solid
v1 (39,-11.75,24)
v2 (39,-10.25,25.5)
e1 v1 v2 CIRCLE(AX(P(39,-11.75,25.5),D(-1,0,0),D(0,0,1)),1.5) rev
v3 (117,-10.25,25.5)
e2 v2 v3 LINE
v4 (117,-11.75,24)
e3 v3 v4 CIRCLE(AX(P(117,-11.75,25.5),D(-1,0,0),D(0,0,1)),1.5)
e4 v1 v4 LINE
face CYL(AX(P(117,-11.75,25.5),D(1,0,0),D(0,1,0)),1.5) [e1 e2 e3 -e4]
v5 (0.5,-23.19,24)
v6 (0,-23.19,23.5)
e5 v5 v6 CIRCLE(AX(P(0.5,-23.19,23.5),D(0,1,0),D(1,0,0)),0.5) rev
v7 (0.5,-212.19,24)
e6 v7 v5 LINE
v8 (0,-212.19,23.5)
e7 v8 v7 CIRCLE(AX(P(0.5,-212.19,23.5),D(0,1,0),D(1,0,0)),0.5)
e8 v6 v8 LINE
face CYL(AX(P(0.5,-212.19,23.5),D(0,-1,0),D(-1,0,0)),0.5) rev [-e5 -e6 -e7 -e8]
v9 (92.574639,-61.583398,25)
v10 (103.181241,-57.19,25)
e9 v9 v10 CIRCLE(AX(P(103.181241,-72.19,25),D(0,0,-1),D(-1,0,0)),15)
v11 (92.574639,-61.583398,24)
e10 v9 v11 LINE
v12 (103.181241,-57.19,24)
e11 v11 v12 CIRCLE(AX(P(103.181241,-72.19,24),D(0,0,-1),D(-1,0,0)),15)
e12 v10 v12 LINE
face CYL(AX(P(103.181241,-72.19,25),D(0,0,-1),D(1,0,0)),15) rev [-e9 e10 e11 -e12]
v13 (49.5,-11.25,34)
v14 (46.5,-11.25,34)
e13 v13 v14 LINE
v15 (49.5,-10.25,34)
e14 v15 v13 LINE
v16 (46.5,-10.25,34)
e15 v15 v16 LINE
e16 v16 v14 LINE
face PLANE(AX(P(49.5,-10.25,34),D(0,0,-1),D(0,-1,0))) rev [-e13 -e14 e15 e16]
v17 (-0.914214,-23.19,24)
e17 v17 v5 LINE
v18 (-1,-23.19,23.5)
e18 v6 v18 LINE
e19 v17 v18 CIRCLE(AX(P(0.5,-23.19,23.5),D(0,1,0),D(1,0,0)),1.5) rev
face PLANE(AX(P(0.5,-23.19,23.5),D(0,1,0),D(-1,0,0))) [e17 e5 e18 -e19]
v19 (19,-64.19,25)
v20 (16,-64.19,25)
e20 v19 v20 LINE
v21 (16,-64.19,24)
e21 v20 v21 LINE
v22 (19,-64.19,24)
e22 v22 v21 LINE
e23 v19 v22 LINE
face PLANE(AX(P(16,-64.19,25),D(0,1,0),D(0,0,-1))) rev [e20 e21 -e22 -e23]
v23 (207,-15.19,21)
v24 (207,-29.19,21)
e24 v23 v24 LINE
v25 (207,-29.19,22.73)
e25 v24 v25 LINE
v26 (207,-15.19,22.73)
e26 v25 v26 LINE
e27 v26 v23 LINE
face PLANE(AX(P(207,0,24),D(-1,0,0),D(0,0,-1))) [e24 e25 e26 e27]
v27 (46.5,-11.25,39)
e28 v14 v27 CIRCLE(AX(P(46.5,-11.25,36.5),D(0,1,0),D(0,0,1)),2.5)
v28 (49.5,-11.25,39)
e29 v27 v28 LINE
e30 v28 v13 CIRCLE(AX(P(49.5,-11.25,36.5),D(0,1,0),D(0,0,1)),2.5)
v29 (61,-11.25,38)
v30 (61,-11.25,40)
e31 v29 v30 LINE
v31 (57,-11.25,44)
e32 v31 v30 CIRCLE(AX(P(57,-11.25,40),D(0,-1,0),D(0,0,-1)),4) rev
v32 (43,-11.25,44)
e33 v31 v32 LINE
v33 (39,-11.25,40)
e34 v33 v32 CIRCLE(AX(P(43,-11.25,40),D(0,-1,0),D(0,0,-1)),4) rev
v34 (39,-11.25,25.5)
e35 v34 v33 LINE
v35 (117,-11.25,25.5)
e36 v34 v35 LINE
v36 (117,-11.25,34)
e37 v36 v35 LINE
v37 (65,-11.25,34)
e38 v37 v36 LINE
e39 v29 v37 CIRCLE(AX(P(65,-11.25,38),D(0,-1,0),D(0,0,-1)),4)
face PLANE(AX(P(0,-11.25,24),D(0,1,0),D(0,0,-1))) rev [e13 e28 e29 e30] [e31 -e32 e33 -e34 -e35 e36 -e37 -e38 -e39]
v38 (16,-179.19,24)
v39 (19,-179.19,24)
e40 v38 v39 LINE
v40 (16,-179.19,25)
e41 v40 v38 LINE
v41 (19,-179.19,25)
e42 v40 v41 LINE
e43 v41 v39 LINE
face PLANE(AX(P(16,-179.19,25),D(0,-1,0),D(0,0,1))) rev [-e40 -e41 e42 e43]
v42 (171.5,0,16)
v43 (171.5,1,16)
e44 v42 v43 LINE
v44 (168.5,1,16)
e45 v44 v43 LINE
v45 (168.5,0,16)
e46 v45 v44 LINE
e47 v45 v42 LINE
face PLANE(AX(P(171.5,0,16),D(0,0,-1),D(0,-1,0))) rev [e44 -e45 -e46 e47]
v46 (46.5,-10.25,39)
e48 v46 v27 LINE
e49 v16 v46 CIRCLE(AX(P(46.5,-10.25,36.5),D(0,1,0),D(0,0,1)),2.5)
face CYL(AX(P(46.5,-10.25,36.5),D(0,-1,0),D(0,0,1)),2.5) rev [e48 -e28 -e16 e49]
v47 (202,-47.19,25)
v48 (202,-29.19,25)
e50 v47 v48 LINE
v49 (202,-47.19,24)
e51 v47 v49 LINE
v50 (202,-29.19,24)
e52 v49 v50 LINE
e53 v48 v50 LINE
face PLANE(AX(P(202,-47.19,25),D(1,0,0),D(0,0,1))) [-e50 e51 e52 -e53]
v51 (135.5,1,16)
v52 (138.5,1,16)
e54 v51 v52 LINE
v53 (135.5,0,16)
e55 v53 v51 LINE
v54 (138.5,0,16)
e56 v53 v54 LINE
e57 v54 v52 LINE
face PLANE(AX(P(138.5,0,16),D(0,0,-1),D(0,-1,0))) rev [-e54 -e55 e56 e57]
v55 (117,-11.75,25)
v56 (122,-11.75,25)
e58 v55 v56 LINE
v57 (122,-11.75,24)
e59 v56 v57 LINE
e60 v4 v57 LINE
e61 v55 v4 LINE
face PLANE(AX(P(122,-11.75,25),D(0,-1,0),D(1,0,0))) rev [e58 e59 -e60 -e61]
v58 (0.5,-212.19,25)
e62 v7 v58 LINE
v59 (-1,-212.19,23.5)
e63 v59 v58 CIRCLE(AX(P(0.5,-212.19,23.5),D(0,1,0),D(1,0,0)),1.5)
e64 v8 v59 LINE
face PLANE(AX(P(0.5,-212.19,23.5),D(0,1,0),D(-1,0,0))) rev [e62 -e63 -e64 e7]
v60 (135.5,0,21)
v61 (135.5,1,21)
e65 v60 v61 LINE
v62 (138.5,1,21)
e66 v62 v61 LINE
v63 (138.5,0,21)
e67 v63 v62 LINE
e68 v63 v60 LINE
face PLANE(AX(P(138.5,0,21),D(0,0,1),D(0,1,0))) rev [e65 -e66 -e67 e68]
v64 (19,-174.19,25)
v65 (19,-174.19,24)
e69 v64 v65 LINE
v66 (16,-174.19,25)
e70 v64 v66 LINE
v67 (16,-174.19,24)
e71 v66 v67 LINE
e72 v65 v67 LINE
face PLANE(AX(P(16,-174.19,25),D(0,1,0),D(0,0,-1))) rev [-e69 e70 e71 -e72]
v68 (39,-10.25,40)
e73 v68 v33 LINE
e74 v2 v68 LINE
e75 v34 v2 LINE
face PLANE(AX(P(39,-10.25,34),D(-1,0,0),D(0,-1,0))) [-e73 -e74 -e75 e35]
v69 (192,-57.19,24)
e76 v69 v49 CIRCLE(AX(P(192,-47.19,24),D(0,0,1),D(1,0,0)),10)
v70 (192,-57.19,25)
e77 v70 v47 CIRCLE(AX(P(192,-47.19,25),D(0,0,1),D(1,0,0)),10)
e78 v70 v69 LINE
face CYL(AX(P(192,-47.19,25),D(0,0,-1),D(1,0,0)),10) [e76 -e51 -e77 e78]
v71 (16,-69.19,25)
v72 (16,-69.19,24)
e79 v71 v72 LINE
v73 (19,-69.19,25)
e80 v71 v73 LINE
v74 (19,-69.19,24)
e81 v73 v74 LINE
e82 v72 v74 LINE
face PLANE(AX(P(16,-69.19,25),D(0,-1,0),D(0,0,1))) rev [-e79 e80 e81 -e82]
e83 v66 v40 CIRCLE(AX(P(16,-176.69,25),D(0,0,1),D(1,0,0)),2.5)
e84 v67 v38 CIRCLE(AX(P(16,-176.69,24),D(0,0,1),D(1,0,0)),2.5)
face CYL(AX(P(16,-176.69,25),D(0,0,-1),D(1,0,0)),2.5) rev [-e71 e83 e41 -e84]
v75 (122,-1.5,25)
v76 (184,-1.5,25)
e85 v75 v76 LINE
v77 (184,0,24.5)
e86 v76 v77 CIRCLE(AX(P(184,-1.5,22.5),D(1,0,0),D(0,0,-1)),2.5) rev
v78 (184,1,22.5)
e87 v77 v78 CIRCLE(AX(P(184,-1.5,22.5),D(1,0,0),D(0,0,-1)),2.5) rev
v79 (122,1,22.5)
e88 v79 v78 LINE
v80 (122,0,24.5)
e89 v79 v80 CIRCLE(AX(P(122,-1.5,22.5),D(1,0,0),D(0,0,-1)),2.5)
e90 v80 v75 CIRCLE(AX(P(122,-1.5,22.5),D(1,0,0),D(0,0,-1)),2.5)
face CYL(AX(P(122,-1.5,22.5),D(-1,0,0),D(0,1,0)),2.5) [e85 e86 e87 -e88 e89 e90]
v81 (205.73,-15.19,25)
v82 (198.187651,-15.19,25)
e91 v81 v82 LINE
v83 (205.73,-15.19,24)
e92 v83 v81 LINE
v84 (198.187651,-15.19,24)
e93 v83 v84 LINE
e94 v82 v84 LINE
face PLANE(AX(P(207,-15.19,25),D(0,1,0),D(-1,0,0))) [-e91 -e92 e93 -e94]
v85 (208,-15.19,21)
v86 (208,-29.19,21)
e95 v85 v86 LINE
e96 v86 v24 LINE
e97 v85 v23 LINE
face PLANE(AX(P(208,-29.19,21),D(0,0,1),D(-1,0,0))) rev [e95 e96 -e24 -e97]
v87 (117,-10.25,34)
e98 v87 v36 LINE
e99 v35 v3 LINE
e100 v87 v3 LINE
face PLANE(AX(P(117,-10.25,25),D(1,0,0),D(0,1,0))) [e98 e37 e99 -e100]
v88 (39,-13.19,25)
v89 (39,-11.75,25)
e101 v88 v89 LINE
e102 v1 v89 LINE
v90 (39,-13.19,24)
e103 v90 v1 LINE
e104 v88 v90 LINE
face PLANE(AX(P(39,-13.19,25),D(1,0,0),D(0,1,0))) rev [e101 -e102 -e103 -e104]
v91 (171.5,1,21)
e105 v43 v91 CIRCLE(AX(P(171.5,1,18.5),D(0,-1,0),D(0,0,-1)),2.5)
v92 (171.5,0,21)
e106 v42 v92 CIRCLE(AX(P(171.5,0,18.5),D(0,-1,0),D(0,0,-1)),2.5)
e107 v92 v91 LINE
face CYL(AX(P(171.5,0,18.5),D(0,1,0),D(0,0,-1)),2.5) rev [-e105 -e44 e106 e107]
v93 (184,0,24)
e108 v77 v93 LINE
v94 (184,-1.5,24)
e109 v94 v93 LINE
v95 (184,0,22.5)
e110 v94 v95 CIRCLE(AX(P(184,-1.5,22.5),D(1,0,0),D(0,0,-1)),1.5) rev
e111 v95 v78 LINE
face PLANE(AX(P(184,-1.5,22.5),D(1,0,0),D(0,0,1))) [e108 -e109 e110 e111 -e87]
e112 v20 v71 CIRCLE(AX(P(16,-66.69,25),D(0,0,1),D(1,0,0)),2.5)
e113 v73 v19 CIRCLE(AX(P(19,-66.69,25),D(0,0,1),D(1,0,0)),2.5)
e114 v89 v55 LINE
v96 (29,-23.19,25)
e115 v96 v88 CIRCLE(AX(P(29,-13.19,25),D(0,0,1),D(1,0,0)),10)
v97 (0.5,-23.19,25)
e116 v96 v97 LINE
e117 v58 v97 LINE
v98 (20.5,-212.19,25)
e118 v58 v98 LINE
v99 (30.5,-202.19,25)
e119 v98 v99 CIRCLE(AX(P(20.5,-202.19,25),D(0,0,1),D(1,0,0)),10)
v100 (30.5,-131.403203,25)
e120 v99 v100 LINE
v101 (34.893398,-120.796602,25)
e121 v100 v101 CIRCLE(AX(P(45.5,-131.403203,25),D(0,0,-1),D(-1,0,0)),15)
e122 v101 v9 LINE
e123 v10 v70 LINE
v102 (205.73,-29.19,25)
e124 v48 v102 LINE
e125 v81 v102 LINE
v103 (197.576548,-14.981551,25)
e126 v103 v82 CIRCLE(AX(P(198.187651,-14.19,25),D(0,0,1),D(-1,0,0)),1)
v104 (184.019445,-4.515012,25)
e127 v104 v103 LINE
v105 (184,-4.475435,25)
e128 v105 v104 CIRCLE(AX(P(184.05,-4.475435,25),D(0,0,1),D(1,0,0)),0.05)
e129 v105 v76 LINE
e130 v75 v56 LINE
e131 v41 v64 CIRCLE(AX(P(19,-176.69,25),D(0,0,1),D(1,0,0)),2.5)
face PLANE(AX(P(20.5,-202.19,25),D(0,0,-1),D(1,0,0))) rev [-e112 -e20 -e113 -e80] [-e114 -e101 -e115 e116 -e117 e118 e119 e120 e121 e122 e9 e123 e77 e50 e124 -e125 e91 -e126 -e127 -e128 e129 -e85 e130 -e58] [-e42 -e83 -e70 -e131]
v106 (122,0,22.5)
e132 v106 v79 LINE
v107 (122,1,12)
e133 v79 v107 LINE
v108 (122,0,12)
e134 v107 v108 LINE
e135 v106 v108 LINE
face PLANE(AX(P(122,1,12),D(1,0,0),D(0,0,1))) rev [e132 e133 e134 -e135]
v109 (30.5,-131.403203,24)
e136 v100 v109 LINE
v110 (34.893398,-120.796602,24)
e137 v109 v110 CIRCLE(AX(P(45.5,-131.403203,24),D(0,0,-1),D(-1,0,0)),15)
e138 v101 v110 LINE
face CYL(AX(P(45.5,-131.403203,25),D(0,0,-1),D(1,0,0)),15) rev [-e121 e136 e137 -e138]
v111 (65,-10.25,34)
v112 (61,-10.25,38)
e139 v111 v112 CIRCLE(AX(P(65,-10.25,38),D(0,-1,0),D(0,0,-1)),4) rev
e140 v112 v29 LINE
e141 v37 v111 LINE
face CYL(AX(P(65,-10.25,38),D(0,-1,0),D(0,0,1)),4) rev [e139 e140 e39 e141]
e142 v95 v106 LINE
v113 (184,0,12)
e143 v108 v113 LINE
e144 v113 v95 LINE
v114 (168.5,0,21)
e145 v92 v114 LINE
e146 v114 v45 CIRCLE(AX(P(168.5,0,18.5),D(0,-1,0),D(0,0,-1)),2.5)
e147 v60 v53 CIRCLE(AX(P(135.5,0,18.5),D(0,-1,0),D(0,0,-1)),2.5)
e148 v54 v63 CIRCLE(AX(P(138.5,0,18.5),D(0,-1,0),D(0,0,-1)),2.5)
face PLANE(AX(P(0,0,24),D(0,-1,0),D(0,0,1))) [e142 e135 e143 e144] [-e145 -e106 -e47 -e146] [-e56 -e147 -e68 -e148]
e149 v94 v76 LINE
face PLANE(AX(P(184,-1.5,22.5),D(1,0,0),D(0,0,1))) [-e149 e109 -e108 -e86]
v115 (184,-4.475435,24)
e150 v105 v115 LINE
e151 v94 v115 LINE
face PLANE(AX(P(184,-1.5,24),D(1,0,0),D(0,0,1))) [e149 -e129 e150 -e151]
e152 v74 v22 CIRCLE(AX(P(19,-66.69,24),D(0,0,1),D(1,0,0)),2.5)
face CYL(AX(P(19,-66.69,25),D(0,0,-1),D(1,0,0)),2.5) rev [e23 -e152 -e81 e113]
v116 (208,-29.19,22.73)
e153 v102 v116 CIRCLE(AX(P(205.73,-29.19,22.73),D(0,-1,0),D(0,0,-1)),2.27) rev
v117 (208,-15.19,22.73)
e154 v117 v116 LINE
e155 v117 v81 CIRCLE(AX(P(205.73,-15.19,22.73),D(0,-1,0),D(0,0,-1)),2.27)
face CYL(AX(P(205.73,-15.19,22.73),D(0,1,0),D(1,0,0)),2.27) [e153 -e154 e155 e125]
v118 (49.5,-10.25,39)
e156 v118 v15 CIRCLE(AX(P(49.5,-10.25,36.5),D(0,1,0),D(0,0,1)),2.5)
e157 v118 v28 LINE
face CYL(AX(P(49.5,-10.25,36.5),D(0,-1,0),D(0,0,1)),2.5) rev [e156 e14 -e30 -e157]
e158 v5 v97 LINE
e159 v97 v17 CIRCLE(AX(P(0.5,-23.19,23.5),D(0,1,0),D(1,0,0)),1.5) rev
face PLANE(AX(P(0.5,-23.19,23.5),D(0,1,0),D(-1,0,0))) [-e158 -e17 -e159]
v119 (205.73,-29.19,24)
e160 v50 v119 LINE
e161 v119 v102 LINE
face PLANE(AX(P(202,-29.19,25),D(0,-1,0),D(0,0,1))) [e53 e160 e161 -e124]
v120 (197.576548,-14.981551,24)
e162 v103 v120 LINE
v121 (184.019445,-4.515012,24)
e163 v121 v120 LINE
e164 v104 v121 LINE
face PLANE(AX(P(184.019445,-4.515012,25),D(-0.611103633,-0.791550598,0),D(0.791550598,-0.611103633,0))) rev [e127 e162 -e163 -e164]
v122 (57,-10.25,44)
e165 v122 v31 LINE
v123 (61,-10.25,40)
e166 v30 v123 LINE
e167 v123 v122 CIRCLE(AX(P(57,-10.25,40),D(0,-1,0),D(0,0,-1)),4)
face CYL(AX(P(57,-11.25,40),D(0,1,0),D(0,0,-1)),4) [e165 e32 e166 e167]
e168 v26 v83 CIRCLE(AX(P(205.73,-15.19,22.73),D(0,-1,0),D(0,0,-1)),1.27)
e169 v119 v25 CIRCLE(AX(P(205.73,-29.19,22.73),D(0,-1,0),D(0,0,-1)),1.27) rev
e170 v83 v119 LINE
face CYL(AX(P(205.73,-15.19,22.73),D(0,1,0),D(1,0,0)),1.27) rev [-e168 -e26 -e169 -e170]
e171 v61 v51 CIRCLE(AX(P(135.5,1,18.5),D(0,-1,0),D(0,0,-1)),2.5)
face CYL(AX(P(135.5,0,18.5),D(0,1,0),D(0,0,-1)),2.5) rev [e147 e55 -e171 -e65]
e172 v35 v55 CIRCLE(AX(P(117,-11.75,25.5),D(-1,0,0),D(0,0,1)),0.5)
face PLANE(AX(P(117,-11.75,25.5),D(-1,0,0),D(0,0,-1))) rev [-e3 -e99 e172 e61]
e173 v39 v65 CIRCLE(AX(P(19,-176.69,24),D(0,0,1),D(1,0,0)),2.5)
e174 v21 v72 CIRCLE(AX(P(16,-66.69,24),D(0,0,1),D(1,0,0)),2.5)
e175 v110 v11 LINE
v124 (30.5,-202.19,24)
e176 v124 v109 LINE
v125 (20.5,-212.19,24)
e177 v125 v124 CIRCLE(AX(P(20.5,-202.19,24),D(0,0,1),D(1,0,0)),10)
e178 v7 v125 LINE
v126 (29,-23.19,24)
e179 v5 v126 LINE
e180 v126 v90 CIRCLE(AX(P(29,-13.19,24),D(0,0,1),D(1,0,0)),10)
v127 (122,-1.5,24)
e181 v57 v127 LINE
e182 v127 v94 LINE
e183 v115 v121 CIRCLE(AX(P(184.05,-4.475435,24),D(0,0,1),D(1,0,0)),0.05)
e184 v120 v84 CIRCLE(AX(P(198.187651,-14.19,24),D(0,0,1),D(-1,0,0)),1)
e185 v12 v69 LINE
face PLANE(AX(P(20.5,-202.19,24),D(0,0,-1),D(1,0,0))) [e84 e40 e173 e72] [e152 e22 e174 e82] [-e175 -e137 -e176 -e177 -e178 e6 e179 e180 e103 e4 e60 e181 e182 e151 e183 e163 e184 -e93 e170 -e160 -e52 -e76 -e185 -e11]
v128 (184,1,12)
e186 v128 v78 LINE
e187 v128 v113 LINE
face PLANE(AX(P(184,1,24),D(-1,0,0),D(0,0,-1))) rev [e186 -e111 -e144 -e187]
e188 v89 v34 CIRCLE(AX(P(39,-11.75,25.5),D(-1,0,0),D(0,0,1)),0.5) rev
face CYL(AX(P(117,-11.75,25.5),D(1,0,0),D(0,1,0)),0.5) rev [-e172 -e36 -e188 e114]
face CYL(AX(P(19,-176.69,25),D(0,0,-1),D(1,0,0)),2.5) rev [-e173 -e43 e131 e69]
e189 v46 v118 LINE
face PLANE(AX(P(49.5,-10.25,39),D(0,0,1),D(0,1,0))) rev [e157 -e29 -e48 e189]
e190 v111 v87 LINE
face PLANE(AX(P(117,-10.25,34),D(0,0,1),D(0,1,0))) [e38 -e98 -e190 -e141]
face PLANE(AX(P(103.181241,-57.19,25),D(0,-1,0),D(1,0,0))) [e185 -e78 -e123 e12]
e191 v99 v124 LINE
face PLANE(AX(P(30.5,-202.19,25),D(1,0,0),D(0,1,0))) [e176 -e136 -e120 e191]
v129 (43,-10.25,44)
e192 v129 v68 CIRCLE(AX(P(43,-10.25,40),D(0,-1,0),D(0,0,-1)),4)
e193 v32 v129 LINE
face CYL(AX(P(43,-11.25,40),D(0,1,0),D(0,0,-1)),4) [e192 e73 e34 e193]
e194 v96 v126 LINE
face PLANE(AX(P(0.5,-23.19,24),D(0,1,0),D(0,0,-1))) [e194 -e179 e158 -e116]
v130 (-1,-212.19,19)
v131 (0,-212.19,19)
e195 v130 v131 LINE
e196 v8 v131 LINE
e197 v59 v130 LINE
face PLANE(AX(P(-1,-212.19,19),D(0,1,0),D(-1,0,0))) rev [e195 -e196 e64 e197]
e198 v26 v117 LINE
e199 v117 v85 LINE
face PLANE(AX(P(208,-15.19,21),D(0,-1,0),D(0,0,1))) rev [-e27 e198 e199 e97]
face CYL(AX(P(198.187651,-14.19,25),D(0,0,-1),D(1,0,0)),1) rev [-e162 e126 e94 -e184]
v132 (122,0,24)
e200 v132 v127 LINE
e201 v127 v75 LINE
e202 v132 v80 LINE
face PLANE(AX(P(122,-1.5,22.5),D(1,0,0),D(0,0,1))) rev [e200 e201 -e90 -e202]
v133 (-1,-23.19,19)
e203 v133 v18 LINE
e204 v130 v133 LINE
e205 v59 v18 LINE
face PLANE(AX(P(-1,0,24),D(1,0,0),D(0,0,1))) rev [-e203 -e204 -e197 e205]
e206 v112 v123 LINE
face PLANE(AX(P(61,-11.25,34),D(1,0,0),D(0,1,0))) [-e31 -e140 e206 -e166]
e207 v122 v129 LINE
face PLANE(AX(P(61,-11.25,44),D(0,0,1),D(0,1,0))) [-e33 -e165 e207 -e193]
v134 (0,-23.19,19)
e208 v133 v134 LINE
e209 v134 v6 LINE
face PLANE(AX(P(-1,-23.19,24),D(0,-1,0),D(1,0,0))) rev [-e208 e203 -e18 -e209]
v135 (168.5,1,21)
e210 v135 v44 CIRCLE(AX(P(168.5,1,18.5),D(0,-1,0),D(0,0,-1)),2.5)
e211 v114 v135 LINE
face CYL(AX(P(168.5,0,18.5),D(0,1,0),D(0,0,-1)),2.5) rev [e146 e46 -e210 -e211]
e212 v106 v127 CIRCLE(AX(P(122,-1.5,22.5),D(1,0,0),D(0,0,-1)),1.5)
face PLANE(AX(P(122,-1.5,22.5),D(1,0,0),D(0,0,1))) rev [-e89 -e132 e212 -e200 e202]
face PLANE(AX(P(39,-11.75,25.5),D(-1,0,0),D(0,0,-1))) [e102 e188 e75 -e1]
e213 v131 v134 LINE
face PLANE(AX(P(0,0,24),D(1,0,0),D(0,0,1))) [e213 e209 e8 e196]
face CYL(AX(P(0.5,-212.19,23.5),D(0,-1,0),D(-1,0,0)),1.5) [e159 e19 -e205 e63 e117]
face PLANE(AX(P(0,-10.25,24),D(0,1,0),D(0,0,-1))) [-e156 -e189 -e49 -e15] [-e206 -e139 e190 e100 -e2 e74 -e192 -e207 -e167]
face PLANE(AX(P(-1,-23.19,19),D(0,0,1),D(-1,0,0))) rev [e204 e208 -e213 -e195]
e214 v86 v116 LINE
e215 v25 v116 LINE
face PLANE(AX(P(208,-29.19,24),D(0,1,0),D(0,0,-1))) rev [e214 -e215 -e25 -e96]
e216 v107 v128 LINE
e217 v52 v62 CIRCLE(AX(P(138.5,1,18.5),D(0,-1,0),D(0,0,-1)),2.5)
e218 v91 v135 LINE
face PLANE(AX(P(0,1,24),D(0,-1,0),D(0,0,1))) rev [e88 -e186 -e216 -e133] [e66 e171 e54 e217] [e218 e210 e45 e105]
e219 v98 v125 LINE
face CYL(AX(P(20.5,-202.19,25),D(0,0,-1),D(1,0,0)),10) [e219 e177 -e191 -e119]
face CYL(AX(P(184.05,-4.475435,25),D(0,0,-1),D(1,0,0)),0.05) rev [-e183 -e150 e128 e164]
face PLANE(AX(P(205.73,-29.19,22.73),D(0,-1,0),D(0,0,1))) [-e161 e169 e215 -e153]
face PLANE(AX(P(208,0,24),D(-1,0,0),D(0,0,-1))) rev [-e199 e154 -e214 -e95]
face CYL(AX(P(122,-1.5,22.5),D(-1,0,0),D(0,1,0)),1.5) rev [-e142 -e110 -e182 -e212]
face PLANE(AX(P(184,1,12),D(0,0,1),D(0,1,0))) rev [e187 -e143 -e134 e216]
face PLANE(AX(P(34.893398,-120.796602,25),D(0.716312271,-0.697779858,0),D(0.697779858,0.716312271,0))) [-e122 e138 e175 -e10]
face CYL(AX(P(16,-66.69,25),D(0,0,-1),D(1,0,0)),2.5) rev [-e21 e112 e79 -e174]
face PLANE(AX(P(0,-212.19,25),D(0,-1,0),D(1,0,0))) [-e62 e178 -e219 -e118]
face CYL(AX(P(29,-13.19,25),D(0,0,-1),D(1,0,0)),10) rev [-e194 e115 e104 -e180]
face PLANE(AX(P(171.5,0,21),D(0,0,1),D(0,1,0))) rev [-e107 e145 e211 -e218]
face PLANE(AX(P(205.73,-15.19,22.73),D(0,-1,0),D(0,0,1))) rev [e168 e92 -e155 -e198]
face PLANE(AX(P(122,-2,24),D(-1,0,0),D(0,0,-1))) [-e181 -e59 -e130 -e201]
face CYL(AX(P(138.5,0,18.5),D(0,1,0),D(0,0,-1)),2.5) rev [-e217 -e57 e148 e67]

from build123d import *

# Parameters (mm, degrees)
BASE_FLANGE1_DEPTH            = 1
EDGE_FLANGE1_STRIP_W          = 5
EDGE_FLANGE1_STRIP_H          = 1
EDGE_FLANGE1_STRIP_CUT_DEPTH  = 189
EDGE_FLANGE1_RELIEF_W         = 5.5
EDGE_FLANGE1_RELIEF_H         = 0.5
EDGE_FLANGE1_RELIEF_CUT_DEPTH = 1
EDGE_FLANGE1_DEPTH            = 189
CUT_EXTRUDE1_DEPTH            = 10
EDGE_FLANGE2_STRIP_W          = 7
EDGE_FLANGE2_STRIP_H          = 1
EDGE_FLANGE2_STRIP_CUT_DEPTH  = 62
EDGE_FLANGE2_RELIEF_W         = 7.5
EDGE_FLANGE2_RELIEF_H         = 0.5
EDGE_FLANGE2_RELIEF_CUT_DEPTH = 1
EDGE_FLANGE2_DEPTH            = 62
SKETCH13_W                    = 5
SKETCH13_H                    = 14
TAB1_DEPTH                    = 1
CUT_EXTRUDE4_DEPTH            = 10
EDGE_FLANGE3_STRIP_W          = 6.54
EDGE_FLANGE3_STRIP_H          = 1
EDGE_FLANGE3_STRIP_CUT_DEPTH  = 14
EDGE_FLANGE3_DEPTH            = 14
CUT_EXTRUDE3_DEPTH            = 10
EDGE_FLANGE5_DEPTH            = 78
SKETCH33_W                    = 22
SKETCH33_H                    = 10
TAB2_DEPTH                    = 1
FILLET1_R                     = 4
FILLET2_R                     = 4
CUT_EXTRUDE5_DEPTH            = 1
CUT_EXTRUDE6_DEPTH            = 1
CUT_EXTRUDE7_DEPTH            = 1


# Sheet-metal steps are written as plain solids
with BuildPart() as part:
    # Sketch1 → Base-Flange1 (new body)
    with BuildSketch(Plane.XY):
        with BuildLine():
            Line((0, 0), (0, -212.19))
            Line((0, -212.19), (20.5, -212.19))
            ThreePointArc((20.5, -212.19), (27.571067812, -209.261067812), (30.5, -202.19))
            Line((30.5, -202.19), (30.5, -131.403203436))
            ThreePointArc((30.5, -131.403203436), (31.641807012, -125.66295195), (34.893398282, -120.796601718))
            Line((34.893398282, -120.796601718), (92.574639149, -61.583398282))
            ThreePointArc((92.574639149, -61.583398282), (97.440989382, -58.331807012), (103.181240867, -57.19))
            Line((103.181240867, -57.19), (192, -57.19))
            ThreePointArc((192, -57.19), (199.071067812, -54.261067812), (202, -47.19))
            Line((202, -47.19), (202, 0))
            Line((202, 0), (0, 0))
        make_face()
    extrude(amount=-BASE_FLANGE1_DEPTH)

    # Edge-Flange1 strip (across the edge) → Edge-Flange1 strip cut (cut)
    with BuildSketch(Plane.XZ.offset(23.19)):
        with Locations((-2, -0.5)):
            Rectangle(EDGE_FLANGE1_STRIP_W, EDGE_FLANGE1_STRIP_H)
    extrude(amount=EDGE_FLANGE1_STRIP_CUT_DEPTH, mode=Mode.SUBTRACT)

    # Edge-Flange1 relief (on the sheet) → Edge-Flange1 relief cut (cut)
    with BuildSketch(Plane(origin=(0.5, -23.19, 0), x_dir=(1, 0, 0), z_dir=(0, 0, 1))):
        with Locations((-2.25, 0.25)):
            Rectangle(EDGE_FLANGE1_RELIEF_W, EDGE_FLANGE1_RELIEF_H)
    extrude(amount=-EDGE_FLANGE1_RELIEF_CUT_DEPTH, mode=Mode.SUBTRACT)

    # Edge-Flange1 section (across the edge) → Edge-Flange1 (add)
    with BuildSketch(Plane.XZ.offset(23.19)):
        with BuildLine():
            Line((-1, 0.5), (-1, 5))
            Line((-1, 5), (0, 5))
            Line((0, 5), (0, 0.5))
            ThreePointArc((0, 0.5), (0.146446609, 0.146446609), (0.5, 0))
            Line((0.5, 0), (0.5, -1))
            ThreePointArc((0.5, -1), (-0.560660172, -0.560660172), (-1, 0.5))
        make_face()
    extrude(amount=EDGE_FLANGE1_DEPTH)

    # Sketch9 → Cut-Extrude1 (cut)
    with BuildSketch(Plane.XY):
        with BuildLine():
            Line((-1, -23.19), (29, -23.19))
            ThreePointArc((29, -23.19), (36.071067812, -20.261067812), (39, -13.19))
            Line((39, -13.19), (39, 0))
            Line((39, 0), (-1, 0))
            Line((-1, 0), (-1, -23.19))
        make_face()
    extrude(amount=-CUT_EXTRUDE1_DEPTH, mode=Mode.SUBTRACT)

    # Edge-Flange2 strip (across the edge) → Edge-Flange2 strip cut (cut)
    with BuildSketch(Plane(origin=(184, 0, 0), x_dir=(0, -1, 0), z_dir=(-1, 0, 0))):
        with Locations((-2, -0.5)):
            Rectangle(EDGE_FLANGE2_STRIP_W, EDGE_FLANGE2_STRIP_H)
    extrude(amount=EDGE_FLANGE2_STRIP_CUT_DEPTH, mode=Mode.SUBTRACT)

    # Edge-Flange2 relief (on the sheet) → Edge-Flange2 relief cut (cut)
    with BuildSketch(Plane(origin=(184, -1.5, 0), x_dir=(0, -1, 0), z_dir=(0, 0, 1))):
        with Locations((-3.25, 0.25)):
            Rectangle(EDGE_FLANGE2_RELIEF_W, EDGE_FLANGE2_RELIEF_H)
        with Locations((-3.25, -62.25)):
            Rectangle(EDGE_FLANGE2_RELIEF_W, EDGE_FLANGE2_RELIEF_H)
    extrude(amount=-EDGE_FLANGE2_RELIEF_CUT_DEPTH, mode=Mode.SUBTRACT)

    # Edge-Flange2 section (across the edge) → Edge-Flange2 (add)
    with BuildSketch(Plane(origin=(184, 0, 0), x_dir=(0, -1, 0), z_dir=(-1, 0, 0))):
        with BuildLine():
            Line((-1, 1.5), (-1, 12))
            Line((-1, 12), (0, 12))
            Line((0, 12), (0, 1.5))
            ThreePointArc((0, 1.5), (0.439339828, 0.439339828), (1.5, 0))
            Line((1.5, 0), (1.5, -1))
            ThreePointArc((1.5, -1), (-0.267766953, -0.267766953), (-1, 1.5))
        make_face()
    extrude(amount=EDGE_FLANGE2_DEPTH)

    # Sketch13 → Tab1 (add)
    with BuildSketch(Plane.XY):
        with Locations((204.5, -22.19)):
            Rectangle(SKETCH13_W, SKETCH13_H)
    extrude(amount=-TAB1_DEPTH)

    # Sketch16 → Cut-Extrude4 (cut)
    with BuildSketch(Plane.XY):
        with BuildLine():
            Line((202, -15.19), (198.18765136, -15.19))
            ThreePointArc((198.18765136, -15.19), (197.864812853, -15.136454066), (197.576547726, -14.981550598))
            Line((197.576547726, -14.981550598), (184.019444818, -4.515012052))
            ThreePointArc((184.019444818, -4.515012052), (184.005123731, -4.497482662), (184, -4.475434523))
            Line((184, -4.475434523), (184, -1.5))
            Line((184, -1.5), (184, 0))
            Line((184, 0), (202, 0))
            Line((202, 0), (202, -15.19))
        make_face()
    extrude(amount=-CUT_EXTRUDE4_DEPTH, mode=Mode.SUBTRACT)

    # Edge-Flange3 strip (across the edge) → Edge-Flange3 strip cut (cut)
    with BuildSketch(Plane(origin=(207, -29.19, 0), x_dir=(-1, 0, 0), z_dir=(0, 1, 0))):
        with Locations((-2, -0.5)):
            Rectangle(EDGE_FLANGE3_STRIP_W, EDGE_FLANGE3_STRIP_H)
    extrude(amount=EDGE_FLANGE3_STRIP_CUT_DEPTH, mode=Mode.SUBTRACT)

    # Edge-Flange3 section (across the edge) → Edge-Flange3 (add)
    with BuildSketch(Plane(origin=(207, -29.19, 0), x_dir=(-1, 0, 0), z_dir=(0, 1, 0))):
        with BuildLine():
            Line((-1, 1.27), (-1, 3))
            Line((-1, 3), (0, 3))
            Line((0, 3), (0, 1.27))
            ThreePointArc((0, 1.27), (0.371974388, 0.371974388), (1.27, 0))
            Line((1.27, 0), (1.27, -1))
            ThreePointArc((1.27, -1), (-0.335132393, -0.335132393), (-1, 1.27))
        make_face()
    extrude(amount=EDGE_FLANGE3_DEPTH)

    # Sketch20 → Cut-Extrude3 (cut)
    with BuildSketch(Plane.XY):
        Polygon((122, -0.75), (122, -11.75), (38.53901494, -11.75), (38.53901494, 0), (122, 0), align=None)
    extrude(amount=-CUT_EXTRUDE3_DEPTH, mode=Mode.SUBTRACT)

    # Edge-Flange5 section (across the edge) → Edge-Flange5 (add)
    with BuildSketch(Plane(origin=(39, -11.25, -1), x_dir=(0, -1, 0), z_dir=(1, 0, 0))):
        with BuildLine():
            Line((-1, 0.5), (-1, 9))
            Line((-1, 9), (0, 9))
            Line((0, 9), (0, 0.5))
            ThreePointArc((0, 0.5), (0.146446609, 0.146446609), (0.5, 0))
            Line((0.5, 0), (0.5, -1))
            ThreePointArc((0.5, -1), (-0.560660172, -0.560660172), (-1, 0.5))
        make_face()
    extrude(amount=EDGE_FLANGE5_DEPTH)

    # Sketch33 → Tab2 (add)
    with BuildSketch(Plane(origin=(0, -10.25, 0), x_dir=(1, 0, 0), z_dir=(0, 1, 0))):
        with Locations((50, 15)):
            Rectangle(SKETCH33_W, SKETCH33_H)
    extrude(amount=-TAB2_DEPTH)

    # Fillet1
    fillet1_edges = [part.edges().sort_by_distance(p)[0] for p in [
        (61, -10.75, -10),
    ]]
    fillet(fillet1_edges, radius=FILLET1_R)

    # Fillet2
    fillet2_edges = [part.edges().sort_by_distance(p)[0] for p in [
        (39, -10.75, -20),
        (61, -10.75, -20),
    ]]
    fillet(fillet2_edges, radius=FILLET2_R)

    # Sketch35 → Cut-Extrude5 (cut)
    with BuildSketch(Plane(origin=(0, 1, 0), x_dir=(1, 0, 0), z_dir=(0, 1, 0))):
        with BuildLine():
            Line((171.5, -8), (168.5, -8))
            ThreePointArc((168.5, -8), (166, -5.5), (168.5, -3))
            Line((168.5, -3), (171.5, -3))
            ThreePointArc((171.5, -3), (174, -5.5), (171.5, -8))
        make_face()
        with BuildLine():
            Line((138.5, -8), (135.5, -8))
            ThreePointArc((135.5, -8), (133, -5.5), (135.5, -3))
            Line((135.5, -3), (138.5, -3))
            ThreePointArc((138.5, -3), (141, -5.5), (138.5, -8))
        make_face()
    extrude(amount=-CUT_EXTRUDE5_DEPTH, mode=Mode.SUBTRACT)

    # Sketch36 → Cut-Extrude6 (cut)
    with BuildSketch(Plane.XZ.offset(11.25)):
        with BuildLine():
            Line((49.5, -15), (46.5, -15))
            ThreePointArc((46.5, -15), (44, -12.5), (46.5, -10))
            Line((46.5, -10), (49.5, -10))
            ThreePointArc((49.5, -10), (52, -12.5), (49.5, -15))
        make_face()
    extrude(amount=-CUT_EXTRUDE6_DEPTH, mode=Mode.SUBTRACT)

    # Sketch38 → Cut-Extrude7 (cut)
    with BuildSketch(Plane.XY):
        with BuildLine():
            Line((16, -174.19), (19, -174.19))
            ThreePointArc((19, -174.19), (21.5, -176.69), (19, -179.19))
            Line((19, -179.19), (16, -179.19))
            ThreePointArc((16, -179.19), (13.5, -176.69), (16, -174.19))
        make_face()
        with BuildLine():
            Line((16, -64.19), (19, -64.19))
            ThreePointArc((19, -64.19), (21.5, -66.69), (19, -69.19))
            Line((19, -69.19), (16, -69.19))
            ThreePointArc((16, -69.19), (13.5, -66.69), (16, -64.19))
        make_face()
    extrude(amount=-CUT_EXTRUDE7_DEPTH, mode=Mode.SUBTRACT)


with BuildPart() as body_2:
    # Mirror1: mirrored copy
    add(part.part.mirror(Plane.XY.offset(12)))


solid = body_2.part
